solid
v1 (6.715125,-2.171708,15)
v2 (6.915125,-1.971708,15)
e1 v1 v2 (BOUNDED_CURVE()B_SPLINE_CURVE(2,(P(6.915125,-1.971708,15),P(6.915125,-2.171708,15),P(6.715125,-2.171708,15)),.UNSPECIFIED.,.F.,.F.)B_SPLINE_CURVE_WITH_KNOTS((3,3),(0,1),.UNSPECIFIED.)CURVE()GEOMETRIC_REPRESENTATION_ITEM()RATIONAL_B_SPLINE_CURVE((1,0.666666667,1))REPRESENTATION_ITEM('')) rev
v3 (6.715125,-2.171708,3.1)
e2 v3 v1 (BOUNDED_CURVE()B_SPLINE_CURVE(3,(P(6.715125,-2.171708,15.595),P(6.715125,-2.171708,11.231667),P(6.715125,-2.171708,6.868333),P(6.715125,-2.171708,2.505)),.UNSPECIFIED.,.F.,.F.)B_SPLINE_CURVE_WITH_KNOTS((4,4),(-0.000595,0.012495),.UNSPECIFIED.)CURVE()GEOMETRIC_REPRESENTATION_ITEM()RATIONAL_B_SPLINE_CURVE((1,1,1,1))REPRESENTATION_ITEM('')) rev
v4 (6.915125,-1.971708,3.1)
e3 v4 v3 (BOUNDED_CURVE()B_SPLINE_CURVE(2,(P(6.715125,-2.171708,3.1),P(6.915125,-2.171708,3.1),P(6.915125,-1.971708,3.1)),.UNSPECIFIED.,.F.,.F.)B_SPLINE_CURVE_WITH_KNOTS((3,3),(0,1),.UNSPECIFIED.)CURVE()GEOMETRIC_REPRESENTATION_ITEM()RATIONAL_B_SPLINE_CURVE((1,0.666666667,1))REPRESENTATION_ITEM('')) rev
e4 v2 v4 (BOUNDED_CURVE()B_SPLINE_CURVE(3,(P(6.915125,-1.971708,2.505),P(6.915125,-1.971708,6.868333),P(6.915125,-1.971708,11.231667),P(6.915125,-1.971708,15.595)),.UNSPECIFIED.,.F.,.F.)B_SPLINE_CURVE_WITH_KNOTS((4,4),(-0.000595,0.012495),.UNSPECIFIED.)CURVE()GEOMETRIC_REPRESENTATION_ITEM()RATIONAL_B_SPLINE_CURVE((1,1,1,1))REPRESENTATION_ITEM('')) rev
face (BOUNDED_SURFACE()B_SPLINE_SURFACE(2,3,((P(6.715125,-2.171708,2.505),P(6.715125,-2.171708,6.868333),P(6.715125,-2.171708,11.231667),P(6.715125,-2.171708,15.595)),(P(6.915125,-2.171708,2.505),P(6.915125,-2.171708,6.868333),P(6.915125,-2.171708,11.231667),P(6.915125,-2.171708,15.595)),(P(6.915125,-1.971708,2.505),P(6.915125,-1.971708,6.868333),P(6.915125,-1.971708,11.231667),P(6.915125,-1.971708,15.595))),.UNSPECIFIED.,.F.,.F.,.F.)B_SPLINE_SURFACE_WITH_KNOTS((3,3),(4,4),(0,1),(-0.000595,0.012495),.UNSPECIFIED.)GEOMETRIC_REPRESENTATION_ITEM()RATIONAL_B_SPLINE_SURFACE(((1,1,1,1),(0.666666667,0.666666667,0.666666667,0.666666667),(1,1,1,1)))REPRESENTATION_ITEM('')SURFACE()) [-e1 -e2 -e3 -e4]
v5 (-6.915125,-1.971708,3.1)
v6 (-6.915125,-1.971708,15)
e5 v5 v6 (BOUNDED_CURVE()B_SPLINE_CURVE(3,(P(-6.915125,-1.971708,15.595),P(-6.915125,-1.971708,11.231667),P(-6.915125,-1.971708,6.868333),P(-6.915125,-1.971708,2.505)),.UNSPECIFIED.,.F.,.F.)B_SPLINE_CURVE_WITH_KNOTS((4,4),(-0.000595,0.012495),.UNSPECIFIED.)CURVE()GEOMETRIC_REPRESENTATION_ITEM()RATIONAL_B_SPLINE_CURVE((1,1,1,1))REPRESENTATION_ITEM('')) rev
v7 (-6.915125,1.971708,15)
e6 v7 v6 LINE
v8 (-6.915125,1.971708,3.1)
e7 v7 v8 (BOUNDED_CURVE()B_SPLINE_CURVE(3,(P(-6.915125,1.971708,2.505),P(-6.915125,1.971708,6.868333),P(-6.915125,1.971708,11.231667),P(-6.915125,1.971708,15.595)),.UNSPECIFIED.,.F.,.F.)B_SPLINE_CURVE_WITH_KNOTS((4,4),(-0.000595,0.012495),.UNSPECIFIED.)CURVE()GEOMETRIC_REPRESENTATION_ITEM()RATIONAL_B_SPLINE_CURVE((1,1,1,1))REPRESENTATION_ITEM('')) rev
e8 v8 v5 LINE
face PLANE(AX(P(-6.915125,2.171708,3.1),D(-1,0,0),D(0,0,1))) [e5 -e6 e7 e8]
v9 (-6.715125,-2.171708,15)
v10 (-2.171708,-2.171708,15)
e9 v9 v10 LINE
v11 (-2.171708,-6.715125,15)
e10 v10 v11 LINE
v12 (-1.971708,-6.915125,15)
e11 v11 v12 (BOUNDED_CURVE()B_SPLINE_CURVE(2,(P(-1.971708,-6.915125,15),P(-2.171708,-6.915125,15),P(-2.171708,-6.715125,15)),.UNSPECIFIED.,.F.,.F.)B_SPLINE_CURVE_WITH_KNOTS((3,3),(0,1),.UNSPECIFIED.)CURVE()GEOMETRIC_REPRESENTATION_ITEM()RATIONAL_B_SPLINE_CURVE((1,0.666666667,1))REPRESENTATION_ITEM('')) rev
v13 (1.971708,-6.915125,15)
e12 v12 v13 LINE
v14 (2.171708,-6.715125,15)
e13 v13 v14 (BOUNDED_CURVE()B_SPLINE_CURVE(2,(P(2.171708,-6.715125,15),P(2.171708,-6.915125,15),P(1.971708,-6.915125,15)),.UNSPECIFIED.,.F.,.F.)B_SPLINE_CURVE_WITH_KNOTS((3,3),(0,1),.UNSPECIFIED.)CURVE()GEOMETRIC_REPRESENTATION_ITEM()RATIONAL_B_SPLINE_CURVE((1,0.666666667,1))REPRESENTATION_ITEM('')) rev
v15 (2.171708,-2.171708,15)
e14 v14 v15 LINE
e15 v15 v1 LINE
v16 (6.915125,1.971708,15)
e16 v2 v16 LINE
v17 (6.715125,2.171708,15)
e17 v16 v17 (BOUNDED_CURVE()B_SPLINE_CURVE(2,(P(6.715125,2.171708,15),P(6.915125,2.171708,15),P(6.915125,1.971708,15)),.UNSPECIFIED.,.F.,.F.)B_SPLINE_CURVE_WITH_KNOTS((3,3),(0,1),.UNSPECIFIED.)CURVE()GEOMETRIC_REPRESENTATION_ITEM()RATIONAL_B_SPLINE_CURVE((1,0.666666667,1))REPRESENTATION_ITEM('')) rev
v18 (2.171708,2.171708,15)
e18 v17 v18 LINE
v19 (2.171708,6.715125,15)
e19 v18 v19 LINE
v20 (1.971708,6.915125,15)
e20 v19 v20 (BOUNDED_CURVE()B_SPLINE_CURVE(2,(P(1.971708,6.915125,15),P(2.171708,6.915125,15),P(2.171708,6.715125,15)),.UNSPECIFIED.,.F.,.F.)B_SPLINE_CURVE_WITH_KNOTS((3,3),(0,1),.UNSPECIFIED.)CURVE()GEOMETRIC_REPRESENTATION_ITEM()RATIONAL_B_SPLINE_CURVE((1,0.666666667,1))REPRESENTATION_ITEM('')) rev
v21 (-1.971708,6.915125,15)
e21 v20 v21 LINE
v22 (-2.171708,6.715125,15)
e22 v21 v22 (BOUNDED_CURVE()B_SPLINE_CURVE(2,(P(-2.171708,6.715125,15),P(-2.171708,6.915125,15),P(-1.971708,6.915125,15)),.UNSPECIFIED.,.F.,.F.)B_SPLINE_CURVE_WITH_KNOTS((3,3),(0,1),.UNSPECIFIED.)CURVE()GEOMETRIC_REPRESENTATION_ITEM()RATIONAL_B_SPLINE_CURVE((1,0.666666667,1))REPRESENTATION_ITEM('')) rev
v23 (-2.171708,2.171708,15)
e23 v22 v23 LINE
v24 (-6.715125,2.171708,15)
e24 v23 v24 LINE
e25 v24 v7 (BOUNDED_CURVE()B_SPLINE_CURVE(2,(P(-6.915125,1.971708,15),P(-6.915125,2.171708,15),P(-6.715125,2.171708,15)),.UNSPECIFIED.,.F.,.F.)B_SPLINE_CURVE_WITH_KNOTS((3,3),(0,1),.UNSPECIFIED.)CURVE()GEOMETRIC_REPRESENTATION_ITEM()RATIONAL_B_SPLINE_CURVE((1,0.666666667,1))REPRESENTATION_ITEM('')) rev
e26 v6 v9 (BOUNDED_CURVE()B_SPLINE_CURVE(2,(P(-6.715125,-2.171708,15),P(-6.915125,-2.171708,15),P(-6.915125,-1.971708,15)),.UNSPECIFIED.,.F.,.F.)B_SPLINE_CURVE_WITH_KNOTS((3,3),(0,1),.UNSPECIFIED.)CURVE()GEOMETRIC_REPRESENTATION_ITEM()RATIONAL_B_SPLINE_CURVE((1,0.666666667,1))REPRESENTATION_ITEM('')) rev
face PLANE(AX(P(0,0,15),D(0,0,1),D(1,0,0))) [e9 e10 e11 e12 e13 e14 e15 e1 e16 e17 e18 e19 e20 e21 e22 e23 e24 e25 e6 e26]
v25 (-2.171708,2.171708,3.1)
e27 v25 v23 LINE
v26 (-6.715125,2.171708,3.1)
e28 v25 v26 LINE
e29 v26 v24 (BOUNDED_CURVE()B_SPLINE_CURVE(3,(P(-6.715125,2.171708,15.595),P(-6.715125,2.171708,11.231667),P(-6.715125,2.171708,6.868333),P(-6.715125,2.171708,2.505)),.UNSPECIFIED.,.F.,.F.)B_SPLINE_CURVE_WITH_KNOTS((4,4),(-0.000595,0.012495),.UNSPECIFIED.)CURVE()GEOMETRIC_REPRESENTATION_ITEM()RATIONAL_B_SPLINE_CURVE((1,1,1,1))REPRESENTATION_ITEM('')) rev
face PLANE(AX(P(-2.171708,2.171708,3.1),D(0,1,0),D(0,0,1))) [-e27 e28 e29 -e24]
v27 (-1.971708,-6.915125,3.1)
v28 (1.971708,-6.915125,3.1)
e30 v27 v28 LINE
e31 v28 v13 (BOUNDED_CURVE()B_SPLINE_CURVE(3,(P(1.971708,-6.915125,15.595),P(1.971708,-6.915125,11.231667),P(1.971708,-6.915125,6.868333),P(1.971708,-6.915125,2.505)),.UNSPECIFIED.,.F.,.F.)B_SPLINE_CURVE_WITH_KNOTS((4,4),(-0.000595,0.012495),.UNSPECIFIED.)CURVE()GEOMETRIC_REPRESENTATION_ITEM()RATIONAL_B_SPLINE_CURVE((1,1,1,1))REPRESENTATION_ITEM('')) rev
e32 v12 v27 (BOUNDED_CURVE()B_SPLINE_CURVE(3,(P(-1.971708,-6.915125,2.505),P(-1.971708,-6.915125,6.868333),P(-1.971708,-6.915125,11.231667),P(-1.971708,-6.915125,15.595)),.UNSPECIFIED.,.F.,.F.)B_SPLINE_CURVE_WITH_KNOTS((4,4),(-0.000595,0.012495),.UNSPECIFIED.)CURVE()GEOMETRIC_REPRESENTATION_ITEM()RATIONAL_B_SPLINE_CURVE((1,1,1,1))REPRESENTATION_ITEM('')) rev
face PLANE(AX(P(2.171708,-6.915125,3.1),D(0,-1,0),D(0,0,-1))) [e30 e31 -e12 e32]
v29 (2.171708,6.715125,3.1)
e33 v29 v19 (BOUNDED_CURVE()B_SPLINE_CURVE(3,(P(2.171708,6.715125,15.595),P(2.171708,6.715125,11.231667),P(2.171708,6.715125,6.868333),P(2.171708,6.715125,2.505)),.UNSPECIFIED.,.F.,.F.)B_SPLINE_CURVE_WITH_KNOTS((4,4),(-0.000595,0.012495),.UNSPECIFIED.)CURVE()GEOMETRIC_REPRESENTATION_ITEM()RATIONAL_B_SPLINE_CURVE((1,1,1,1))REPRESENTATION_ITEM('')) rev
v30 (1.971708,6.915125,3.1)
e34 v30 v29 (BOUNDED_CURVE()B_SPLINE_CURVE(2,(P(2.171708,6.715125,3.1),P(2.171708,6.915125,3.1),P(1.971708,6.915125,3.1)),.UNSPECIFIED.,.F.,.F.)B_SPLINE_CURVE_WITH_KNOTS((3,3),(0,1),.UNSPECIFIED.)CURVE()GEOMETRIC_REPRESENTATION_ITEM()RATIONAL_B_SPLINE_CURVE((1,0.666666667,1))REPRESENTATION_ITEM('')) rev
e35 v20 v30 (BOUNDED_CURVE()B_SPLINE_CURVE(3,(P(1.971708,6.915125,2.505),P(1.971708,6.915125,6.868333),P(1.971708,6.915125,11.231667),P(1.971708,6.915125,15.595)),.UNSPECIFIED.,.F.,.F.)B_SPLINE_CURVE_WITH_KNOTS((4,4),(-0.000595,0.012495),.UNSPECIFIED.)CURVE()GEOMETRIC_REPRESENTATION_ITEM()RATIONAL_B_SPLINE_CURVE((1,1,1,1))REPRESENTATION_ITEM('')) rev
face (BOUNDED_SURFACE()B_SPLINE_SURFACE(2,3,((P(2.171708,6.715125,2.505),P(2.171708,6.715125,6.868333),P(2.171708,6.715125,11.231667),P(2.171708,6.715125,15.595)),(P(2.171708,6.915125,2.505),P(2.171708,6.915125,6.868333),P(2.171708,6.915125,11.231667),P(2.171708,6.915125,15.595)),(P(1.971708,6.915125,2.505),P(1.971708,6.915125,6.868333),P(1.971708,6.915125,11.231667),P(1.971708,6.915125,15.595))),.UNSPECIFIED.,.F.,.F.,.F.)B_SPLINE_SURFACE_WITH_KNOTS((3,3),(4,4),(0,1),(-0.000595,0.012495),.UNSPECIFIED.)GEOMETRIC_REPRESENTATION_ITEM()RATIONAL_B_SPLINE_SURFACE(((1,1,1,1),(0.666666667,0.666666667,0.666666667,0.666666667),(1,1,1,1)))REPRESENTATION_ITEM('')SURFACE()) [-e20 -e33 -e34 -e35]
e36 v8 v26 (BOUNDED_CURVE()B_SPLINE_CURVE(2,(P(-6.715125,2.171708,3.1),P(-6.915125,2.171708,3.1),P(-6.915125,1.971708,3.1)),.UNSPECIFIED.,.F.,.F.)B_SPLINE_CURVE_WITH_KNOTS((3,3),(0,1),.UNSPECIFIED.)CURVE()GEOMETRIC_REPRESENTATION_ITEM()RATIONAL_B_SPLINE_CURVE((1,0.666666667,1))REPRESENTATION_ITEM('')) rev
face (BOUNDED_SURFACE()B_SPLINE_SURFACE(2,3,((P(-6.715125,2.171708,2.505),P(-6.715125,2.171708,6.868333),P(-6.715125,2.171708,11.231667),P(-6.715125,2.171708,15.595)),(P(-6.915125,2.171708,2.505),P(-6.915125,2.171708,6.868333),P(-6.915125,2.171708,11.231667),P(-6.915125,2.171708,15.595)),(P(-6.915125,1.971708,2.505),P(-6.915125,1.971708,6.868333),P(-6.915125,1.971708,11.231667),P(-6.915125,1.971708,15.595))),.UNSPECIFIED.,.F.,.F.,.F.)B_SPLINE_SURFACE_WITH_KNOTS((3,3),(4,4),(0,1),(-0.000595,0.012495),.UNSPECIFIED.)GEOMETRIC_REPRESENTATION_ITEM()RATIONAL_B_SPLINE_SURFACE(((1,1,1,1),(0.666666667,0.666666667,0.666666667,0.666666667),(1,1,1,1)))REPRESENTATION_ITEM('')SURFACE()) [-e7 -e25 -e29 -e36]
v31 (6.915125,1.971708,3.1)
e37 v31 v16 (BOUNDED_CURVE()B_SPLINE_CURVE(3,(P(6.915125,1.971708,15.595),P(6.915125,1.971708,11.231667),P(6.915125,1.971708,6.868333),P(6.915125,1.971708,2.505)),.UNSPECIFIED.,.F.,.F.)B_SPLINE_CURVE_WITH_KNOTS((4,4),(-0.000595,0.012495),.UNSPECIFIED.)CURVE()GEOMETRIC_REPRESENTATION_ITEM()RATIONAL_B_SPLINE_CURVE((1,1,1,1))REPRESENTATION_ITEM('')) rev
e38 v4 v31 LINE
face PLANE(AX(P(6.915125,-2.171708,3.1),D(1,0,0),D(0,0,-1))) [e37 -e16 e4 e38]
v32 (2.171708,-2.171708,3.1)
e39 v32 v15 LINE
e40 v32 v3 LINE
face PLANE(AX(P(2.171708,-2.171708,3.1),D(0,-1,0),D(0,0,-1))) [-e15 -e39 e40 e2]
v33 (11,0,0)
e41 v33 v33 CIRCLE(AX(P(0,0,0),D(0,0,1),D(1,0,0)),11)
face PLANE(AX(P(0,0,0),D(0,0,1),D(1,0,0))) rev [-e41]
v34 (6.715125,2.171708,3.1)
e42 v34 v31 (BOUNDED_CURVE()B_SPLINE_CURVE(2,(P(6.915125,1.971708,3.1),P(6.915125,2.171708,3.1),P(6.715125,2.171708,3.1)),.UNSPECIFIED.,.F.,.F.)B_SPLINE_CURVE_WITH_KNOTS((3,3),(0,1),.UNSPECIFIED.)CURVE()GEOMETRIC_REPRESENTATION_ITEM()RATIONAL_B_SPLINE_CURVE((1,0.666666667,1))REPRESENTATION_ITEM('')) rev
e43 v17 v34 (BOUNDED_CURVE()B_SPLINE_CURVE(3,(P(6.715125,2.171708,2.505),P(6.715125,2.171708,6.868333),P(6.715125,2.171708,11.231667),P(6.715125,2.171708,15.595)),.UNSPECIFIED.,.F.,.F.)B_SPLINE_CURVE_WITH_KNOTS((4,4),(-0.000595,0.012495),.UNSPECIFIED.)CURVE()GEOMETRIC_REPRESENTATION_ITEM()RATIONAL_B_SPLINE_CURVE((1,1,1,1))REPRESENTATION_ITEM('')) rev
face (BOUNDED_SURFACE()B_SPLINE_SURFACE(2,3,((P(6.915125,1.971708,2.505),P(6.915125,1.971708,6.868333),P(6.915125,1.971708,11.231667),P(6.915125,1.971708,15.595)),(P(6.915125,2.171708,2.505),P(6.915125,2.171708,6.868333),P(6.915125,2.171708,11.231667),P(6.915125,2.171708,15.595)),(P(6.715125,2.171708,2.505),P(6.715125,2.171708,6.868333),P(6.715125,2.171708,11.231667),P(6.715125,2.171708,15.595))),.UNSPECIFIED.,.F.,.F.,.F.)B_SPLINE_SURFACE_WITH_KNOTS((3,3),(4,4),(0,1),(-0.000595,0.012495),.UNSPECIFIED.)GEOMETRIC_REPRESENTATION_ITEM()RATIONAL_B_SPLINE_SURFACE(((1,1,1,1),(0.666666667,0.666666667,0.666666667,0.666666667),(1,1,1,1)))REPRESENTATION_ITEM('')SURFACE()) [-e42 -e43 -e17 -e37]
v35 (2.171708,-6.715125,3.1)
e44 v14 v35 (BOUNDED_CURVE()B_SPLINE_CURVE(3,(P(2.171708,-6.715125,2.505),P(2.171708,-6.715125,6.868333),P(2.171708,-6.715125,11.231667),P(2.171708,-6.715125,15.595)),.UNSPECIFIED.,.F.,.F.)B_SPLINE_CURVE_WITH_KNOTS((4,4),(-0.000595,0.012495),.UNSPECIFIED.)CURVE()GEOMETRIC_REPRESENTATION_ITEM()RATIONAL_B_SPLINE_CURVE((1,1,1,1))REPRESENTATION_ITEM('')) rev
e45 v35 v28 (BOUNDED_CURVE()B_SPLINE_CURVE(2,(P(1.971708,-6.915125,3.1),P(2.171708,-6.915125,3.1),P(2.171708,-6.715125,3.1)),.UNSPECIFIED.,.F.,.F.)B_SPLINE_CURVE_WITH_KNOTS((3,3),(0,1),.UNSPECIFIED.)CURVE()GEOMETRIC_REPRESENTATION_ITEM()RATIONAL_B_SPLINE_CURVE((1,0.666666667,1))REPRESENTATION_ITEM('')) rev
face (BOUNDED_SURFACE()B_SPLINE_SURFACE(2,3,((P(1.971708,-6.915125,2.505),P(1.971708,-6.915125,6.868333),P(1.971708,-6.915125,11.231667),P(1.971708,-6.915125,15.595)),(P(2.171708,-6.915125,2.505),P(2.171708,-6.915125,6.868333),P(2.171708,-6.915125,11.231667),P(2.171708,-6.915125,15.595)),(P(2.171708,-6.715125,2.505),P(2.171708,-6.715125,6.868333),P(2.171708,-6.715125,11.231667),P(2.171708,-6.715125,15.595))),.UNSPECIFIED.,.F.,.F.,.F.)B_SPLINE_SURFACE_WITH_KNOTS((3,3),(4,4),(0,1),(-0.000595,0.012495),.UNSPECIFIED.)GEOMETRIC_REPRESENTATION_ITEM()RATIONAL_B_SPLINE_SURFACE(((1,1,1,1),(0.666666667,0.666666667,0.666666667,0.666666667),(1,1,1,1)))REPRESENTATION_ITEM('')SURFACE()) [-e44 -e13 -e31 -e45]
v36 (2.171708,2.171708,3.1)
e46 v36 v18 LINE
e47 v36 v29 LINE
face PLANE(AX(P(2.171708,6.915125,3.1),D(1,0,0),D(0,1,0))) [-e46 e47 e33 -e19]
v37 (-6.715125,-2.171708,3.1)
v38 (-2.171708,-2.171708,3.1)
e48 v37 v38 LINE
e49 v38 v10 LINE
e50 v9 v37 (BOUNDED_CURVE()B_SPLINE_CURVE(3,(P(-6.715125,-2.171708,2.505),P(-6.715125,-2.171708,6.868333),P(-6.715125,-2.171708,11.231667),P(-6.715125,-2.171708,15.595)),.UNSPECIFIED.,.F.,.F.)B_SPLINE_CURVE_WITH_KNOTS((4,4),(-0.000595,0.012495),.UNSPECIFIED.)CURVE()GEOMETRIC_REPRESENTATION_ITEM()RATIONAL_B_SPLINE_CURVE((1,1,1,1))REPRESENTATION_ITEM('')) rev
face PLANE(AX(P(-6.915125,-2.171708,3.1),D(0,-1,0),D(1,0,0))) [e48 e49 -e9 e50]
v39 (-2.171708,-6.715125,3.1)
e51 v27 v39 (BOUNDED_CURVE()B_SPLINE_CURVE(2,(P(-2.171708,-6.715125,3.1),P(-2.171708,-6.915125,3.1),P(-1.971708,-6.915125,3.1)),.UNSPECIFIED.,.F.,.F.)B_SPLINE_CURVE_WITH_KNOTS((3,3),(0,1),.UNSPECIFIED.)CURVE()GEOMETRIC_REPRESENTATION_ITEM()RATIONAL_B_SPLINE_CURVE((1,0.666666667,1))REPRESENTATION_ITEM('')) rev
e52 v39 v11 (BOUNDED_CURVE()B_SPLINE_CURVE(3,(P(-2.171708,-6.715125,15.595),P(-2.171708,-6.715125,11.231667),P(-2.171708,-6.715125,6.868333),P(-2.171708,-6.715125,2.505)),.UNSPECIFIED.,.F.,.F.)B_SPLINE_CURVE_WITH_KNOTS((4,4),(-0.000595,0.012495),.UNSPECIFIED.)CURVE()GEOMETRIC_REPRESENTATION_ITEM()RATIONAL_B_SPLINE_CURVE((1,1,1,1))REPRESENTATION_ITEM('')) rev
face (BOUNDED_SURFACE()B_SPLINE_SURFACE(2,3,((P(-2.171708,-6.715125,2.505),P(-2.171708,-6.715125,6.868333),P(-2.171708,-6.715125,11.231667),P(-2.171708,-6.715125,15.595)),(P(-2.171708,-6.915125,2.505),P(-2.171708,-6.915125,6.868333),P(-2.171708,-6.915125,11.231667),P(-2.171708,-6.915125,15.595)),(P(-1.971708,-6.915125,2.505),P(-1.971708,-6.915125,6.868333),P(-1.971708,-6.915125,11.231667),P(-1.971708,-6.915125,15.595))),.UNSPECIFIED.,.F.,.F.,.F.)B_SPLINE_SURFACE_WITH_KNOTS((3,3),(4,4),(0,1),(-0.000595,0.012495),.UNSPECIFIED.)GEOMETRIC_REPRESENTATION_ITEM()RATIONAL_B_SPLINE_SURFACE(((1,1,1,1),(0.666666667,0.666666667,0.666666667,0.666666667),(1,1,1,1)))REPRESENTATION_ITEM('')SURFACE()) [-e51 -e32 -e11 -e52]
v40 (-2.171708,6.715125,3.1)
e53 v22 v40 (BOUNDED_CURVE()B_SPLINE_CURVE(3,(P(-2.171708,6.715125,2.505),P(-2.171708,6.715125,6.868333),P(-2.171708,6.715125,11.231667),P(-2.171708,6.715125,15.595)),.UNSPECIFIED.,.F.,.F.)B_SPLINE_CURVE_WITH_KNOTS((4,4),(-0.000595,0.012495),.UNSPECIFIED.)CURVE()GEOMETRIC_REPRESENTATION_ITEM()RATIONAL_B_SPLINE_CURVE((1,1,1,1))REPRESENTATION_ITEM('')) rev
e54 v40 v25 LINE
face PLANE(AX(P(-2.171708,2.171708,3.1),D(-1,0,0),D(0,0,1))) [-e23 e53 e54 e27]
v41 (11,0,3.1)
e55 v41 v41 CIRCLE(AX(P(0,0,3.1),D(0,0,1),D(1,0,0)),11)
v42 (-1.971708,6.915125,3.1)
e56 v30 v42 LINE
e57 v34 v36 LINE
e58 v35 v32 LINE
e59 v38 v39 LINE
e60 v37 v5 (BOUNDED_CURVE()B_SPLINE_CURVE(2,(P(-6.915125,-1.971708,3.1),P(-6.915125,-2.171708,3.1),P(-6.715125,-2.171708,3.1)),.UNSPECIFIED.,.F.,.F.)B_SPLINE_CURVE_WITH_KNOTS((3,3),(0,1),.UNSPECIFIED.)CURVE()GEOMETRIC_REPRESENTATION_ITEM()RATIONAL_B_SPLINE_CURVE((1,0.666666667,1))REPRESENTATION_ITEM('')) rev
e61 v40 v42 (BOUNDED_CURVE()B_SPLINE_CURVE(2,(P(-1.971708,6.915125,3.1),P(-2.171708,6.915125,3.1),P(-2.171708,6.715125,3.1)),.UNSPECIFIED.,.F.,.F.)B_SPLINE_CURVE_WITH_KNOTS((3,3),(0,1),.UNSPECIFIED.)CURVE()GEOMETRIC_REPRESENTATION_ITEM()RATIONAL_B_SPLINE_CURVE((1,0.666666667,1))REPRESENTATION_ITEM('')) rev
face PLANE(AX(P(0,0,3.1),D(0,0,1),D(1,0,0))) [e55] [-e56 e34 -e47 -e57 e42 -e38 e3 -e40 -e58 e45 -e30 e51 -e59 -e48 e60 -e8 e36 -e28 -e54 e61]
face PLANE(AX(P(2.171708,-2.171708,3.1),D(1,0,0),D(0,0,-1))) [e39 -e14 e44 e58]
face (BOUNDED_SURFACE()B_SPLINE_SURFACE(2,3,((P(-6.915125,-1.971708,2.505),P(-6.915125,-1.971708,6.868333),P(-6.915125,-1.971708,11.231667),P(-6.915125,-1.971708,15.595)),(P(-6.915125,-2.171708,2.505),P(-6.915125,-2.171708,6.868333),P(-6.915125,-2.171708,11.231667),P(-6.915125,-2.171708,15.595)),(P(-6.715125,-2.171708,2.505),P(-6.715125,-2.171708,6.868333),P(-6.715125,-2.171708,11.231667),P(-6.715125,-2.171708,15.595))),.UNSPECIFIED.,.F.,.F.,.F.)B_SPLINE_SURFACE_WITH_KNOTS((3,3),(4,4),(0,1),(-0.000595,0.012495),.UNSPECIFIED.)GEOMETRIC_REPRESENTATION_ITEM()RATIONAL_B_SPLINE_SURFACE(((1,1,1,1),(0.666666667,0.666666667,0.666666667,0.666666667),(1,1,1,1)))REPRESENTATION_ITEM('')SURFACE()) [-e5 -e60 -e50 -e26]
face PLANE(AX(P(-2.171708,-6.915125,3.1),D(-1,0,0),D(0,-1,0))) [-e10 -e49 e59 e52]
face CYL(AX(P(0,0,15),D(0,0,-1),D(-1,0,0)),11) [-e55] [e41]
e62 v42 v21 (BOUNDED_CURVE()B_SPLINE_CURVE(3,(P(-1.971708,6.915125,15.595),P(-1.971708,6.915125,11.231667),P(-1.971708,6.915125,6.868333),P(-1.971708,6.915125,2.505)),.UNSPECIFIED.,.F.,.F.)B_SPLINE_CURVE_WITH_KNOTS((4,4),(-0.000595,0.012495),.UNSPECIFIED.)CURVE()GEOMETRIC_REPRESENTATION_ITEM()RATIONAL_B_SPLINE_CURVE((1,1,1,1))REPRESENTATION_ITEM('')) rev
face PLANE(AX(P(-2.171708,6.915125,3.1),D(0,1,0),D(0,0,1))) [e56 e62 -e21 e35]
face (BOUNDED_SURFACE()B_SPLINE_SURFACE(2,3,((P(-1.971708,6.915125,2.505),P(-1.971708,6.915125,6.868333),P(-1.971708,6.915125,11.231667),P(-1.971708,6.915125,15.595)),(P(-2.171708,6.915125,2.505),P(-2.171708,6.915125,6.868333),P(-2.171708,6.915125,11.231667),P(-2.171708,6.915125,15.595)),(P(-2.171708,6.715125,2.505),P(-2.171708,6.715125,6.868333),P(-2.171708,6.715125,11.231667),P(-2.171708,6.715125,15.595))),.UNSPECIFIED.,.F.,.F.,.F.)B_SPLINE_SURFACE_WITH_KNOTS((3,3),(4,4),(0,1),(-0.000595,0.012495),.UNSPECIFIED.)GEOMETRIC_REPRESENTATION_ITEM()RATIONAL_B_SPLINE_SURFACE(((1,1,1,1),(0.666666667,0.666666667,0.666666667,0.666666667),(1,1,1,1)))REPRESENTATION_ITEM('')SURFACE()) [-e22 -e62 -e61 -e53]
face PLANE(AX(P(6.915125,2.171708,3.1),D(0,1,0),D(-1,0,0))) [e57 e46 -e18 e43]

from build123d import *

# Parameters (mm, degrees)
SKETCH1_R           = 11
BOSS_EXTRUDE1_DEPTH = 15
CUT_EXTRUDE1_START  = -11.9
SKETCH2_R           = 11
CUT_EXTRUDE1_DEPTH  = 11.9
FILLET1_SIZE        = 0.2


with BuildPart() as part:
    # Sketch1 → Boss-Extrude1 (new body)
    with BuildSketch(Plane.XY):
        Circle(SKETCH1_R)
    extrude(amount=BOSS_EXTRUDE1_DEPTH)

    # Sketch2 → Cut-Extrude1 (cut)
    with BuildSketch(Plane.XY.offset(15).offset(CUT_EXTRUDE1_START)):
        Circle(SKETCH2_R)
        Polygon((-2.171708245, 2.171708245), (-6.915124735, 2.171708245), (-6.915124735, -2.171708245), (-2.171708245, -2.171708245), (-2.171708245, -6.915124735), (2.171708245, -6.915124735), (2.171708245, -2.171708245), (6.915124735, -2.171708245), (6.915124735, 2.171708245), (2.171708245, 2.171708245), (2.171708245, 6.915124735), (-2.171708245, 6.915124735), align=None, mode=Mode.SUBTRACT)
    extrude(amount=CUT_EXTRUDE1_DEPTH, mode=Mode.SUBTRACT)

    # Fillet1
    # a fillet whose section is not a circle: 0.2 mm, written as the material it takes off along each edge
    with BuildSketch(Plane(origin=(-6.915124735, 2.171708245, 3.1), x_dir=(0, -1, 0), z_dir=(0, 0, 1)), Plane(origin=(-6.915124735, -2.171708245, 3.1), x_dir=(1, 0, 0), z_dir=(0, 0, 1)), Plane(origin=(-2.171708245, -6.915124735, 3.1), x_dir=(1, 0, 0), z_dir=(0, 0, 1)), Plane(origin=(2.171708245, -6.915124735, 3.1), x_dir=(0, 1, 0), z_dir=(0, 0, 1)), Plane(origin=(6.915124735, -2.171708245, 3.1), x_dir=(0, 1, 0), z_dir=(0, 0, 1)), Plane(origin=(6.915124735, 2.171708245, 3.1), x_dir=(-1, 0, 0), z_dir=(0, 0, 1)), Plane(origin=(2.171708245, 6.915124735, 3.1), x_dir=(-1, 0, 0), z_dir=(0, 0, 1)), Plane(origin=(-2.171708245, 6.915124735, 3.1), x_dir=(0, -1, 0), z_dir=(0, 0, 1))) as fillet1_piece_1:
        with BuildLine():
            Bezier((FILLET1_SIZE, 0), (0, 0), (0, FILLET1_SIZE), weights=[1, 0.666666667, 1])
            Line((0, FILLET1_SIZE), (0, 0))
            Line((0, 0), (FILLET1_SIZE, 0))
        make_face()
    extrude(amount=12.4, mode=Mode.SUBTRACT)


solid = part.part
